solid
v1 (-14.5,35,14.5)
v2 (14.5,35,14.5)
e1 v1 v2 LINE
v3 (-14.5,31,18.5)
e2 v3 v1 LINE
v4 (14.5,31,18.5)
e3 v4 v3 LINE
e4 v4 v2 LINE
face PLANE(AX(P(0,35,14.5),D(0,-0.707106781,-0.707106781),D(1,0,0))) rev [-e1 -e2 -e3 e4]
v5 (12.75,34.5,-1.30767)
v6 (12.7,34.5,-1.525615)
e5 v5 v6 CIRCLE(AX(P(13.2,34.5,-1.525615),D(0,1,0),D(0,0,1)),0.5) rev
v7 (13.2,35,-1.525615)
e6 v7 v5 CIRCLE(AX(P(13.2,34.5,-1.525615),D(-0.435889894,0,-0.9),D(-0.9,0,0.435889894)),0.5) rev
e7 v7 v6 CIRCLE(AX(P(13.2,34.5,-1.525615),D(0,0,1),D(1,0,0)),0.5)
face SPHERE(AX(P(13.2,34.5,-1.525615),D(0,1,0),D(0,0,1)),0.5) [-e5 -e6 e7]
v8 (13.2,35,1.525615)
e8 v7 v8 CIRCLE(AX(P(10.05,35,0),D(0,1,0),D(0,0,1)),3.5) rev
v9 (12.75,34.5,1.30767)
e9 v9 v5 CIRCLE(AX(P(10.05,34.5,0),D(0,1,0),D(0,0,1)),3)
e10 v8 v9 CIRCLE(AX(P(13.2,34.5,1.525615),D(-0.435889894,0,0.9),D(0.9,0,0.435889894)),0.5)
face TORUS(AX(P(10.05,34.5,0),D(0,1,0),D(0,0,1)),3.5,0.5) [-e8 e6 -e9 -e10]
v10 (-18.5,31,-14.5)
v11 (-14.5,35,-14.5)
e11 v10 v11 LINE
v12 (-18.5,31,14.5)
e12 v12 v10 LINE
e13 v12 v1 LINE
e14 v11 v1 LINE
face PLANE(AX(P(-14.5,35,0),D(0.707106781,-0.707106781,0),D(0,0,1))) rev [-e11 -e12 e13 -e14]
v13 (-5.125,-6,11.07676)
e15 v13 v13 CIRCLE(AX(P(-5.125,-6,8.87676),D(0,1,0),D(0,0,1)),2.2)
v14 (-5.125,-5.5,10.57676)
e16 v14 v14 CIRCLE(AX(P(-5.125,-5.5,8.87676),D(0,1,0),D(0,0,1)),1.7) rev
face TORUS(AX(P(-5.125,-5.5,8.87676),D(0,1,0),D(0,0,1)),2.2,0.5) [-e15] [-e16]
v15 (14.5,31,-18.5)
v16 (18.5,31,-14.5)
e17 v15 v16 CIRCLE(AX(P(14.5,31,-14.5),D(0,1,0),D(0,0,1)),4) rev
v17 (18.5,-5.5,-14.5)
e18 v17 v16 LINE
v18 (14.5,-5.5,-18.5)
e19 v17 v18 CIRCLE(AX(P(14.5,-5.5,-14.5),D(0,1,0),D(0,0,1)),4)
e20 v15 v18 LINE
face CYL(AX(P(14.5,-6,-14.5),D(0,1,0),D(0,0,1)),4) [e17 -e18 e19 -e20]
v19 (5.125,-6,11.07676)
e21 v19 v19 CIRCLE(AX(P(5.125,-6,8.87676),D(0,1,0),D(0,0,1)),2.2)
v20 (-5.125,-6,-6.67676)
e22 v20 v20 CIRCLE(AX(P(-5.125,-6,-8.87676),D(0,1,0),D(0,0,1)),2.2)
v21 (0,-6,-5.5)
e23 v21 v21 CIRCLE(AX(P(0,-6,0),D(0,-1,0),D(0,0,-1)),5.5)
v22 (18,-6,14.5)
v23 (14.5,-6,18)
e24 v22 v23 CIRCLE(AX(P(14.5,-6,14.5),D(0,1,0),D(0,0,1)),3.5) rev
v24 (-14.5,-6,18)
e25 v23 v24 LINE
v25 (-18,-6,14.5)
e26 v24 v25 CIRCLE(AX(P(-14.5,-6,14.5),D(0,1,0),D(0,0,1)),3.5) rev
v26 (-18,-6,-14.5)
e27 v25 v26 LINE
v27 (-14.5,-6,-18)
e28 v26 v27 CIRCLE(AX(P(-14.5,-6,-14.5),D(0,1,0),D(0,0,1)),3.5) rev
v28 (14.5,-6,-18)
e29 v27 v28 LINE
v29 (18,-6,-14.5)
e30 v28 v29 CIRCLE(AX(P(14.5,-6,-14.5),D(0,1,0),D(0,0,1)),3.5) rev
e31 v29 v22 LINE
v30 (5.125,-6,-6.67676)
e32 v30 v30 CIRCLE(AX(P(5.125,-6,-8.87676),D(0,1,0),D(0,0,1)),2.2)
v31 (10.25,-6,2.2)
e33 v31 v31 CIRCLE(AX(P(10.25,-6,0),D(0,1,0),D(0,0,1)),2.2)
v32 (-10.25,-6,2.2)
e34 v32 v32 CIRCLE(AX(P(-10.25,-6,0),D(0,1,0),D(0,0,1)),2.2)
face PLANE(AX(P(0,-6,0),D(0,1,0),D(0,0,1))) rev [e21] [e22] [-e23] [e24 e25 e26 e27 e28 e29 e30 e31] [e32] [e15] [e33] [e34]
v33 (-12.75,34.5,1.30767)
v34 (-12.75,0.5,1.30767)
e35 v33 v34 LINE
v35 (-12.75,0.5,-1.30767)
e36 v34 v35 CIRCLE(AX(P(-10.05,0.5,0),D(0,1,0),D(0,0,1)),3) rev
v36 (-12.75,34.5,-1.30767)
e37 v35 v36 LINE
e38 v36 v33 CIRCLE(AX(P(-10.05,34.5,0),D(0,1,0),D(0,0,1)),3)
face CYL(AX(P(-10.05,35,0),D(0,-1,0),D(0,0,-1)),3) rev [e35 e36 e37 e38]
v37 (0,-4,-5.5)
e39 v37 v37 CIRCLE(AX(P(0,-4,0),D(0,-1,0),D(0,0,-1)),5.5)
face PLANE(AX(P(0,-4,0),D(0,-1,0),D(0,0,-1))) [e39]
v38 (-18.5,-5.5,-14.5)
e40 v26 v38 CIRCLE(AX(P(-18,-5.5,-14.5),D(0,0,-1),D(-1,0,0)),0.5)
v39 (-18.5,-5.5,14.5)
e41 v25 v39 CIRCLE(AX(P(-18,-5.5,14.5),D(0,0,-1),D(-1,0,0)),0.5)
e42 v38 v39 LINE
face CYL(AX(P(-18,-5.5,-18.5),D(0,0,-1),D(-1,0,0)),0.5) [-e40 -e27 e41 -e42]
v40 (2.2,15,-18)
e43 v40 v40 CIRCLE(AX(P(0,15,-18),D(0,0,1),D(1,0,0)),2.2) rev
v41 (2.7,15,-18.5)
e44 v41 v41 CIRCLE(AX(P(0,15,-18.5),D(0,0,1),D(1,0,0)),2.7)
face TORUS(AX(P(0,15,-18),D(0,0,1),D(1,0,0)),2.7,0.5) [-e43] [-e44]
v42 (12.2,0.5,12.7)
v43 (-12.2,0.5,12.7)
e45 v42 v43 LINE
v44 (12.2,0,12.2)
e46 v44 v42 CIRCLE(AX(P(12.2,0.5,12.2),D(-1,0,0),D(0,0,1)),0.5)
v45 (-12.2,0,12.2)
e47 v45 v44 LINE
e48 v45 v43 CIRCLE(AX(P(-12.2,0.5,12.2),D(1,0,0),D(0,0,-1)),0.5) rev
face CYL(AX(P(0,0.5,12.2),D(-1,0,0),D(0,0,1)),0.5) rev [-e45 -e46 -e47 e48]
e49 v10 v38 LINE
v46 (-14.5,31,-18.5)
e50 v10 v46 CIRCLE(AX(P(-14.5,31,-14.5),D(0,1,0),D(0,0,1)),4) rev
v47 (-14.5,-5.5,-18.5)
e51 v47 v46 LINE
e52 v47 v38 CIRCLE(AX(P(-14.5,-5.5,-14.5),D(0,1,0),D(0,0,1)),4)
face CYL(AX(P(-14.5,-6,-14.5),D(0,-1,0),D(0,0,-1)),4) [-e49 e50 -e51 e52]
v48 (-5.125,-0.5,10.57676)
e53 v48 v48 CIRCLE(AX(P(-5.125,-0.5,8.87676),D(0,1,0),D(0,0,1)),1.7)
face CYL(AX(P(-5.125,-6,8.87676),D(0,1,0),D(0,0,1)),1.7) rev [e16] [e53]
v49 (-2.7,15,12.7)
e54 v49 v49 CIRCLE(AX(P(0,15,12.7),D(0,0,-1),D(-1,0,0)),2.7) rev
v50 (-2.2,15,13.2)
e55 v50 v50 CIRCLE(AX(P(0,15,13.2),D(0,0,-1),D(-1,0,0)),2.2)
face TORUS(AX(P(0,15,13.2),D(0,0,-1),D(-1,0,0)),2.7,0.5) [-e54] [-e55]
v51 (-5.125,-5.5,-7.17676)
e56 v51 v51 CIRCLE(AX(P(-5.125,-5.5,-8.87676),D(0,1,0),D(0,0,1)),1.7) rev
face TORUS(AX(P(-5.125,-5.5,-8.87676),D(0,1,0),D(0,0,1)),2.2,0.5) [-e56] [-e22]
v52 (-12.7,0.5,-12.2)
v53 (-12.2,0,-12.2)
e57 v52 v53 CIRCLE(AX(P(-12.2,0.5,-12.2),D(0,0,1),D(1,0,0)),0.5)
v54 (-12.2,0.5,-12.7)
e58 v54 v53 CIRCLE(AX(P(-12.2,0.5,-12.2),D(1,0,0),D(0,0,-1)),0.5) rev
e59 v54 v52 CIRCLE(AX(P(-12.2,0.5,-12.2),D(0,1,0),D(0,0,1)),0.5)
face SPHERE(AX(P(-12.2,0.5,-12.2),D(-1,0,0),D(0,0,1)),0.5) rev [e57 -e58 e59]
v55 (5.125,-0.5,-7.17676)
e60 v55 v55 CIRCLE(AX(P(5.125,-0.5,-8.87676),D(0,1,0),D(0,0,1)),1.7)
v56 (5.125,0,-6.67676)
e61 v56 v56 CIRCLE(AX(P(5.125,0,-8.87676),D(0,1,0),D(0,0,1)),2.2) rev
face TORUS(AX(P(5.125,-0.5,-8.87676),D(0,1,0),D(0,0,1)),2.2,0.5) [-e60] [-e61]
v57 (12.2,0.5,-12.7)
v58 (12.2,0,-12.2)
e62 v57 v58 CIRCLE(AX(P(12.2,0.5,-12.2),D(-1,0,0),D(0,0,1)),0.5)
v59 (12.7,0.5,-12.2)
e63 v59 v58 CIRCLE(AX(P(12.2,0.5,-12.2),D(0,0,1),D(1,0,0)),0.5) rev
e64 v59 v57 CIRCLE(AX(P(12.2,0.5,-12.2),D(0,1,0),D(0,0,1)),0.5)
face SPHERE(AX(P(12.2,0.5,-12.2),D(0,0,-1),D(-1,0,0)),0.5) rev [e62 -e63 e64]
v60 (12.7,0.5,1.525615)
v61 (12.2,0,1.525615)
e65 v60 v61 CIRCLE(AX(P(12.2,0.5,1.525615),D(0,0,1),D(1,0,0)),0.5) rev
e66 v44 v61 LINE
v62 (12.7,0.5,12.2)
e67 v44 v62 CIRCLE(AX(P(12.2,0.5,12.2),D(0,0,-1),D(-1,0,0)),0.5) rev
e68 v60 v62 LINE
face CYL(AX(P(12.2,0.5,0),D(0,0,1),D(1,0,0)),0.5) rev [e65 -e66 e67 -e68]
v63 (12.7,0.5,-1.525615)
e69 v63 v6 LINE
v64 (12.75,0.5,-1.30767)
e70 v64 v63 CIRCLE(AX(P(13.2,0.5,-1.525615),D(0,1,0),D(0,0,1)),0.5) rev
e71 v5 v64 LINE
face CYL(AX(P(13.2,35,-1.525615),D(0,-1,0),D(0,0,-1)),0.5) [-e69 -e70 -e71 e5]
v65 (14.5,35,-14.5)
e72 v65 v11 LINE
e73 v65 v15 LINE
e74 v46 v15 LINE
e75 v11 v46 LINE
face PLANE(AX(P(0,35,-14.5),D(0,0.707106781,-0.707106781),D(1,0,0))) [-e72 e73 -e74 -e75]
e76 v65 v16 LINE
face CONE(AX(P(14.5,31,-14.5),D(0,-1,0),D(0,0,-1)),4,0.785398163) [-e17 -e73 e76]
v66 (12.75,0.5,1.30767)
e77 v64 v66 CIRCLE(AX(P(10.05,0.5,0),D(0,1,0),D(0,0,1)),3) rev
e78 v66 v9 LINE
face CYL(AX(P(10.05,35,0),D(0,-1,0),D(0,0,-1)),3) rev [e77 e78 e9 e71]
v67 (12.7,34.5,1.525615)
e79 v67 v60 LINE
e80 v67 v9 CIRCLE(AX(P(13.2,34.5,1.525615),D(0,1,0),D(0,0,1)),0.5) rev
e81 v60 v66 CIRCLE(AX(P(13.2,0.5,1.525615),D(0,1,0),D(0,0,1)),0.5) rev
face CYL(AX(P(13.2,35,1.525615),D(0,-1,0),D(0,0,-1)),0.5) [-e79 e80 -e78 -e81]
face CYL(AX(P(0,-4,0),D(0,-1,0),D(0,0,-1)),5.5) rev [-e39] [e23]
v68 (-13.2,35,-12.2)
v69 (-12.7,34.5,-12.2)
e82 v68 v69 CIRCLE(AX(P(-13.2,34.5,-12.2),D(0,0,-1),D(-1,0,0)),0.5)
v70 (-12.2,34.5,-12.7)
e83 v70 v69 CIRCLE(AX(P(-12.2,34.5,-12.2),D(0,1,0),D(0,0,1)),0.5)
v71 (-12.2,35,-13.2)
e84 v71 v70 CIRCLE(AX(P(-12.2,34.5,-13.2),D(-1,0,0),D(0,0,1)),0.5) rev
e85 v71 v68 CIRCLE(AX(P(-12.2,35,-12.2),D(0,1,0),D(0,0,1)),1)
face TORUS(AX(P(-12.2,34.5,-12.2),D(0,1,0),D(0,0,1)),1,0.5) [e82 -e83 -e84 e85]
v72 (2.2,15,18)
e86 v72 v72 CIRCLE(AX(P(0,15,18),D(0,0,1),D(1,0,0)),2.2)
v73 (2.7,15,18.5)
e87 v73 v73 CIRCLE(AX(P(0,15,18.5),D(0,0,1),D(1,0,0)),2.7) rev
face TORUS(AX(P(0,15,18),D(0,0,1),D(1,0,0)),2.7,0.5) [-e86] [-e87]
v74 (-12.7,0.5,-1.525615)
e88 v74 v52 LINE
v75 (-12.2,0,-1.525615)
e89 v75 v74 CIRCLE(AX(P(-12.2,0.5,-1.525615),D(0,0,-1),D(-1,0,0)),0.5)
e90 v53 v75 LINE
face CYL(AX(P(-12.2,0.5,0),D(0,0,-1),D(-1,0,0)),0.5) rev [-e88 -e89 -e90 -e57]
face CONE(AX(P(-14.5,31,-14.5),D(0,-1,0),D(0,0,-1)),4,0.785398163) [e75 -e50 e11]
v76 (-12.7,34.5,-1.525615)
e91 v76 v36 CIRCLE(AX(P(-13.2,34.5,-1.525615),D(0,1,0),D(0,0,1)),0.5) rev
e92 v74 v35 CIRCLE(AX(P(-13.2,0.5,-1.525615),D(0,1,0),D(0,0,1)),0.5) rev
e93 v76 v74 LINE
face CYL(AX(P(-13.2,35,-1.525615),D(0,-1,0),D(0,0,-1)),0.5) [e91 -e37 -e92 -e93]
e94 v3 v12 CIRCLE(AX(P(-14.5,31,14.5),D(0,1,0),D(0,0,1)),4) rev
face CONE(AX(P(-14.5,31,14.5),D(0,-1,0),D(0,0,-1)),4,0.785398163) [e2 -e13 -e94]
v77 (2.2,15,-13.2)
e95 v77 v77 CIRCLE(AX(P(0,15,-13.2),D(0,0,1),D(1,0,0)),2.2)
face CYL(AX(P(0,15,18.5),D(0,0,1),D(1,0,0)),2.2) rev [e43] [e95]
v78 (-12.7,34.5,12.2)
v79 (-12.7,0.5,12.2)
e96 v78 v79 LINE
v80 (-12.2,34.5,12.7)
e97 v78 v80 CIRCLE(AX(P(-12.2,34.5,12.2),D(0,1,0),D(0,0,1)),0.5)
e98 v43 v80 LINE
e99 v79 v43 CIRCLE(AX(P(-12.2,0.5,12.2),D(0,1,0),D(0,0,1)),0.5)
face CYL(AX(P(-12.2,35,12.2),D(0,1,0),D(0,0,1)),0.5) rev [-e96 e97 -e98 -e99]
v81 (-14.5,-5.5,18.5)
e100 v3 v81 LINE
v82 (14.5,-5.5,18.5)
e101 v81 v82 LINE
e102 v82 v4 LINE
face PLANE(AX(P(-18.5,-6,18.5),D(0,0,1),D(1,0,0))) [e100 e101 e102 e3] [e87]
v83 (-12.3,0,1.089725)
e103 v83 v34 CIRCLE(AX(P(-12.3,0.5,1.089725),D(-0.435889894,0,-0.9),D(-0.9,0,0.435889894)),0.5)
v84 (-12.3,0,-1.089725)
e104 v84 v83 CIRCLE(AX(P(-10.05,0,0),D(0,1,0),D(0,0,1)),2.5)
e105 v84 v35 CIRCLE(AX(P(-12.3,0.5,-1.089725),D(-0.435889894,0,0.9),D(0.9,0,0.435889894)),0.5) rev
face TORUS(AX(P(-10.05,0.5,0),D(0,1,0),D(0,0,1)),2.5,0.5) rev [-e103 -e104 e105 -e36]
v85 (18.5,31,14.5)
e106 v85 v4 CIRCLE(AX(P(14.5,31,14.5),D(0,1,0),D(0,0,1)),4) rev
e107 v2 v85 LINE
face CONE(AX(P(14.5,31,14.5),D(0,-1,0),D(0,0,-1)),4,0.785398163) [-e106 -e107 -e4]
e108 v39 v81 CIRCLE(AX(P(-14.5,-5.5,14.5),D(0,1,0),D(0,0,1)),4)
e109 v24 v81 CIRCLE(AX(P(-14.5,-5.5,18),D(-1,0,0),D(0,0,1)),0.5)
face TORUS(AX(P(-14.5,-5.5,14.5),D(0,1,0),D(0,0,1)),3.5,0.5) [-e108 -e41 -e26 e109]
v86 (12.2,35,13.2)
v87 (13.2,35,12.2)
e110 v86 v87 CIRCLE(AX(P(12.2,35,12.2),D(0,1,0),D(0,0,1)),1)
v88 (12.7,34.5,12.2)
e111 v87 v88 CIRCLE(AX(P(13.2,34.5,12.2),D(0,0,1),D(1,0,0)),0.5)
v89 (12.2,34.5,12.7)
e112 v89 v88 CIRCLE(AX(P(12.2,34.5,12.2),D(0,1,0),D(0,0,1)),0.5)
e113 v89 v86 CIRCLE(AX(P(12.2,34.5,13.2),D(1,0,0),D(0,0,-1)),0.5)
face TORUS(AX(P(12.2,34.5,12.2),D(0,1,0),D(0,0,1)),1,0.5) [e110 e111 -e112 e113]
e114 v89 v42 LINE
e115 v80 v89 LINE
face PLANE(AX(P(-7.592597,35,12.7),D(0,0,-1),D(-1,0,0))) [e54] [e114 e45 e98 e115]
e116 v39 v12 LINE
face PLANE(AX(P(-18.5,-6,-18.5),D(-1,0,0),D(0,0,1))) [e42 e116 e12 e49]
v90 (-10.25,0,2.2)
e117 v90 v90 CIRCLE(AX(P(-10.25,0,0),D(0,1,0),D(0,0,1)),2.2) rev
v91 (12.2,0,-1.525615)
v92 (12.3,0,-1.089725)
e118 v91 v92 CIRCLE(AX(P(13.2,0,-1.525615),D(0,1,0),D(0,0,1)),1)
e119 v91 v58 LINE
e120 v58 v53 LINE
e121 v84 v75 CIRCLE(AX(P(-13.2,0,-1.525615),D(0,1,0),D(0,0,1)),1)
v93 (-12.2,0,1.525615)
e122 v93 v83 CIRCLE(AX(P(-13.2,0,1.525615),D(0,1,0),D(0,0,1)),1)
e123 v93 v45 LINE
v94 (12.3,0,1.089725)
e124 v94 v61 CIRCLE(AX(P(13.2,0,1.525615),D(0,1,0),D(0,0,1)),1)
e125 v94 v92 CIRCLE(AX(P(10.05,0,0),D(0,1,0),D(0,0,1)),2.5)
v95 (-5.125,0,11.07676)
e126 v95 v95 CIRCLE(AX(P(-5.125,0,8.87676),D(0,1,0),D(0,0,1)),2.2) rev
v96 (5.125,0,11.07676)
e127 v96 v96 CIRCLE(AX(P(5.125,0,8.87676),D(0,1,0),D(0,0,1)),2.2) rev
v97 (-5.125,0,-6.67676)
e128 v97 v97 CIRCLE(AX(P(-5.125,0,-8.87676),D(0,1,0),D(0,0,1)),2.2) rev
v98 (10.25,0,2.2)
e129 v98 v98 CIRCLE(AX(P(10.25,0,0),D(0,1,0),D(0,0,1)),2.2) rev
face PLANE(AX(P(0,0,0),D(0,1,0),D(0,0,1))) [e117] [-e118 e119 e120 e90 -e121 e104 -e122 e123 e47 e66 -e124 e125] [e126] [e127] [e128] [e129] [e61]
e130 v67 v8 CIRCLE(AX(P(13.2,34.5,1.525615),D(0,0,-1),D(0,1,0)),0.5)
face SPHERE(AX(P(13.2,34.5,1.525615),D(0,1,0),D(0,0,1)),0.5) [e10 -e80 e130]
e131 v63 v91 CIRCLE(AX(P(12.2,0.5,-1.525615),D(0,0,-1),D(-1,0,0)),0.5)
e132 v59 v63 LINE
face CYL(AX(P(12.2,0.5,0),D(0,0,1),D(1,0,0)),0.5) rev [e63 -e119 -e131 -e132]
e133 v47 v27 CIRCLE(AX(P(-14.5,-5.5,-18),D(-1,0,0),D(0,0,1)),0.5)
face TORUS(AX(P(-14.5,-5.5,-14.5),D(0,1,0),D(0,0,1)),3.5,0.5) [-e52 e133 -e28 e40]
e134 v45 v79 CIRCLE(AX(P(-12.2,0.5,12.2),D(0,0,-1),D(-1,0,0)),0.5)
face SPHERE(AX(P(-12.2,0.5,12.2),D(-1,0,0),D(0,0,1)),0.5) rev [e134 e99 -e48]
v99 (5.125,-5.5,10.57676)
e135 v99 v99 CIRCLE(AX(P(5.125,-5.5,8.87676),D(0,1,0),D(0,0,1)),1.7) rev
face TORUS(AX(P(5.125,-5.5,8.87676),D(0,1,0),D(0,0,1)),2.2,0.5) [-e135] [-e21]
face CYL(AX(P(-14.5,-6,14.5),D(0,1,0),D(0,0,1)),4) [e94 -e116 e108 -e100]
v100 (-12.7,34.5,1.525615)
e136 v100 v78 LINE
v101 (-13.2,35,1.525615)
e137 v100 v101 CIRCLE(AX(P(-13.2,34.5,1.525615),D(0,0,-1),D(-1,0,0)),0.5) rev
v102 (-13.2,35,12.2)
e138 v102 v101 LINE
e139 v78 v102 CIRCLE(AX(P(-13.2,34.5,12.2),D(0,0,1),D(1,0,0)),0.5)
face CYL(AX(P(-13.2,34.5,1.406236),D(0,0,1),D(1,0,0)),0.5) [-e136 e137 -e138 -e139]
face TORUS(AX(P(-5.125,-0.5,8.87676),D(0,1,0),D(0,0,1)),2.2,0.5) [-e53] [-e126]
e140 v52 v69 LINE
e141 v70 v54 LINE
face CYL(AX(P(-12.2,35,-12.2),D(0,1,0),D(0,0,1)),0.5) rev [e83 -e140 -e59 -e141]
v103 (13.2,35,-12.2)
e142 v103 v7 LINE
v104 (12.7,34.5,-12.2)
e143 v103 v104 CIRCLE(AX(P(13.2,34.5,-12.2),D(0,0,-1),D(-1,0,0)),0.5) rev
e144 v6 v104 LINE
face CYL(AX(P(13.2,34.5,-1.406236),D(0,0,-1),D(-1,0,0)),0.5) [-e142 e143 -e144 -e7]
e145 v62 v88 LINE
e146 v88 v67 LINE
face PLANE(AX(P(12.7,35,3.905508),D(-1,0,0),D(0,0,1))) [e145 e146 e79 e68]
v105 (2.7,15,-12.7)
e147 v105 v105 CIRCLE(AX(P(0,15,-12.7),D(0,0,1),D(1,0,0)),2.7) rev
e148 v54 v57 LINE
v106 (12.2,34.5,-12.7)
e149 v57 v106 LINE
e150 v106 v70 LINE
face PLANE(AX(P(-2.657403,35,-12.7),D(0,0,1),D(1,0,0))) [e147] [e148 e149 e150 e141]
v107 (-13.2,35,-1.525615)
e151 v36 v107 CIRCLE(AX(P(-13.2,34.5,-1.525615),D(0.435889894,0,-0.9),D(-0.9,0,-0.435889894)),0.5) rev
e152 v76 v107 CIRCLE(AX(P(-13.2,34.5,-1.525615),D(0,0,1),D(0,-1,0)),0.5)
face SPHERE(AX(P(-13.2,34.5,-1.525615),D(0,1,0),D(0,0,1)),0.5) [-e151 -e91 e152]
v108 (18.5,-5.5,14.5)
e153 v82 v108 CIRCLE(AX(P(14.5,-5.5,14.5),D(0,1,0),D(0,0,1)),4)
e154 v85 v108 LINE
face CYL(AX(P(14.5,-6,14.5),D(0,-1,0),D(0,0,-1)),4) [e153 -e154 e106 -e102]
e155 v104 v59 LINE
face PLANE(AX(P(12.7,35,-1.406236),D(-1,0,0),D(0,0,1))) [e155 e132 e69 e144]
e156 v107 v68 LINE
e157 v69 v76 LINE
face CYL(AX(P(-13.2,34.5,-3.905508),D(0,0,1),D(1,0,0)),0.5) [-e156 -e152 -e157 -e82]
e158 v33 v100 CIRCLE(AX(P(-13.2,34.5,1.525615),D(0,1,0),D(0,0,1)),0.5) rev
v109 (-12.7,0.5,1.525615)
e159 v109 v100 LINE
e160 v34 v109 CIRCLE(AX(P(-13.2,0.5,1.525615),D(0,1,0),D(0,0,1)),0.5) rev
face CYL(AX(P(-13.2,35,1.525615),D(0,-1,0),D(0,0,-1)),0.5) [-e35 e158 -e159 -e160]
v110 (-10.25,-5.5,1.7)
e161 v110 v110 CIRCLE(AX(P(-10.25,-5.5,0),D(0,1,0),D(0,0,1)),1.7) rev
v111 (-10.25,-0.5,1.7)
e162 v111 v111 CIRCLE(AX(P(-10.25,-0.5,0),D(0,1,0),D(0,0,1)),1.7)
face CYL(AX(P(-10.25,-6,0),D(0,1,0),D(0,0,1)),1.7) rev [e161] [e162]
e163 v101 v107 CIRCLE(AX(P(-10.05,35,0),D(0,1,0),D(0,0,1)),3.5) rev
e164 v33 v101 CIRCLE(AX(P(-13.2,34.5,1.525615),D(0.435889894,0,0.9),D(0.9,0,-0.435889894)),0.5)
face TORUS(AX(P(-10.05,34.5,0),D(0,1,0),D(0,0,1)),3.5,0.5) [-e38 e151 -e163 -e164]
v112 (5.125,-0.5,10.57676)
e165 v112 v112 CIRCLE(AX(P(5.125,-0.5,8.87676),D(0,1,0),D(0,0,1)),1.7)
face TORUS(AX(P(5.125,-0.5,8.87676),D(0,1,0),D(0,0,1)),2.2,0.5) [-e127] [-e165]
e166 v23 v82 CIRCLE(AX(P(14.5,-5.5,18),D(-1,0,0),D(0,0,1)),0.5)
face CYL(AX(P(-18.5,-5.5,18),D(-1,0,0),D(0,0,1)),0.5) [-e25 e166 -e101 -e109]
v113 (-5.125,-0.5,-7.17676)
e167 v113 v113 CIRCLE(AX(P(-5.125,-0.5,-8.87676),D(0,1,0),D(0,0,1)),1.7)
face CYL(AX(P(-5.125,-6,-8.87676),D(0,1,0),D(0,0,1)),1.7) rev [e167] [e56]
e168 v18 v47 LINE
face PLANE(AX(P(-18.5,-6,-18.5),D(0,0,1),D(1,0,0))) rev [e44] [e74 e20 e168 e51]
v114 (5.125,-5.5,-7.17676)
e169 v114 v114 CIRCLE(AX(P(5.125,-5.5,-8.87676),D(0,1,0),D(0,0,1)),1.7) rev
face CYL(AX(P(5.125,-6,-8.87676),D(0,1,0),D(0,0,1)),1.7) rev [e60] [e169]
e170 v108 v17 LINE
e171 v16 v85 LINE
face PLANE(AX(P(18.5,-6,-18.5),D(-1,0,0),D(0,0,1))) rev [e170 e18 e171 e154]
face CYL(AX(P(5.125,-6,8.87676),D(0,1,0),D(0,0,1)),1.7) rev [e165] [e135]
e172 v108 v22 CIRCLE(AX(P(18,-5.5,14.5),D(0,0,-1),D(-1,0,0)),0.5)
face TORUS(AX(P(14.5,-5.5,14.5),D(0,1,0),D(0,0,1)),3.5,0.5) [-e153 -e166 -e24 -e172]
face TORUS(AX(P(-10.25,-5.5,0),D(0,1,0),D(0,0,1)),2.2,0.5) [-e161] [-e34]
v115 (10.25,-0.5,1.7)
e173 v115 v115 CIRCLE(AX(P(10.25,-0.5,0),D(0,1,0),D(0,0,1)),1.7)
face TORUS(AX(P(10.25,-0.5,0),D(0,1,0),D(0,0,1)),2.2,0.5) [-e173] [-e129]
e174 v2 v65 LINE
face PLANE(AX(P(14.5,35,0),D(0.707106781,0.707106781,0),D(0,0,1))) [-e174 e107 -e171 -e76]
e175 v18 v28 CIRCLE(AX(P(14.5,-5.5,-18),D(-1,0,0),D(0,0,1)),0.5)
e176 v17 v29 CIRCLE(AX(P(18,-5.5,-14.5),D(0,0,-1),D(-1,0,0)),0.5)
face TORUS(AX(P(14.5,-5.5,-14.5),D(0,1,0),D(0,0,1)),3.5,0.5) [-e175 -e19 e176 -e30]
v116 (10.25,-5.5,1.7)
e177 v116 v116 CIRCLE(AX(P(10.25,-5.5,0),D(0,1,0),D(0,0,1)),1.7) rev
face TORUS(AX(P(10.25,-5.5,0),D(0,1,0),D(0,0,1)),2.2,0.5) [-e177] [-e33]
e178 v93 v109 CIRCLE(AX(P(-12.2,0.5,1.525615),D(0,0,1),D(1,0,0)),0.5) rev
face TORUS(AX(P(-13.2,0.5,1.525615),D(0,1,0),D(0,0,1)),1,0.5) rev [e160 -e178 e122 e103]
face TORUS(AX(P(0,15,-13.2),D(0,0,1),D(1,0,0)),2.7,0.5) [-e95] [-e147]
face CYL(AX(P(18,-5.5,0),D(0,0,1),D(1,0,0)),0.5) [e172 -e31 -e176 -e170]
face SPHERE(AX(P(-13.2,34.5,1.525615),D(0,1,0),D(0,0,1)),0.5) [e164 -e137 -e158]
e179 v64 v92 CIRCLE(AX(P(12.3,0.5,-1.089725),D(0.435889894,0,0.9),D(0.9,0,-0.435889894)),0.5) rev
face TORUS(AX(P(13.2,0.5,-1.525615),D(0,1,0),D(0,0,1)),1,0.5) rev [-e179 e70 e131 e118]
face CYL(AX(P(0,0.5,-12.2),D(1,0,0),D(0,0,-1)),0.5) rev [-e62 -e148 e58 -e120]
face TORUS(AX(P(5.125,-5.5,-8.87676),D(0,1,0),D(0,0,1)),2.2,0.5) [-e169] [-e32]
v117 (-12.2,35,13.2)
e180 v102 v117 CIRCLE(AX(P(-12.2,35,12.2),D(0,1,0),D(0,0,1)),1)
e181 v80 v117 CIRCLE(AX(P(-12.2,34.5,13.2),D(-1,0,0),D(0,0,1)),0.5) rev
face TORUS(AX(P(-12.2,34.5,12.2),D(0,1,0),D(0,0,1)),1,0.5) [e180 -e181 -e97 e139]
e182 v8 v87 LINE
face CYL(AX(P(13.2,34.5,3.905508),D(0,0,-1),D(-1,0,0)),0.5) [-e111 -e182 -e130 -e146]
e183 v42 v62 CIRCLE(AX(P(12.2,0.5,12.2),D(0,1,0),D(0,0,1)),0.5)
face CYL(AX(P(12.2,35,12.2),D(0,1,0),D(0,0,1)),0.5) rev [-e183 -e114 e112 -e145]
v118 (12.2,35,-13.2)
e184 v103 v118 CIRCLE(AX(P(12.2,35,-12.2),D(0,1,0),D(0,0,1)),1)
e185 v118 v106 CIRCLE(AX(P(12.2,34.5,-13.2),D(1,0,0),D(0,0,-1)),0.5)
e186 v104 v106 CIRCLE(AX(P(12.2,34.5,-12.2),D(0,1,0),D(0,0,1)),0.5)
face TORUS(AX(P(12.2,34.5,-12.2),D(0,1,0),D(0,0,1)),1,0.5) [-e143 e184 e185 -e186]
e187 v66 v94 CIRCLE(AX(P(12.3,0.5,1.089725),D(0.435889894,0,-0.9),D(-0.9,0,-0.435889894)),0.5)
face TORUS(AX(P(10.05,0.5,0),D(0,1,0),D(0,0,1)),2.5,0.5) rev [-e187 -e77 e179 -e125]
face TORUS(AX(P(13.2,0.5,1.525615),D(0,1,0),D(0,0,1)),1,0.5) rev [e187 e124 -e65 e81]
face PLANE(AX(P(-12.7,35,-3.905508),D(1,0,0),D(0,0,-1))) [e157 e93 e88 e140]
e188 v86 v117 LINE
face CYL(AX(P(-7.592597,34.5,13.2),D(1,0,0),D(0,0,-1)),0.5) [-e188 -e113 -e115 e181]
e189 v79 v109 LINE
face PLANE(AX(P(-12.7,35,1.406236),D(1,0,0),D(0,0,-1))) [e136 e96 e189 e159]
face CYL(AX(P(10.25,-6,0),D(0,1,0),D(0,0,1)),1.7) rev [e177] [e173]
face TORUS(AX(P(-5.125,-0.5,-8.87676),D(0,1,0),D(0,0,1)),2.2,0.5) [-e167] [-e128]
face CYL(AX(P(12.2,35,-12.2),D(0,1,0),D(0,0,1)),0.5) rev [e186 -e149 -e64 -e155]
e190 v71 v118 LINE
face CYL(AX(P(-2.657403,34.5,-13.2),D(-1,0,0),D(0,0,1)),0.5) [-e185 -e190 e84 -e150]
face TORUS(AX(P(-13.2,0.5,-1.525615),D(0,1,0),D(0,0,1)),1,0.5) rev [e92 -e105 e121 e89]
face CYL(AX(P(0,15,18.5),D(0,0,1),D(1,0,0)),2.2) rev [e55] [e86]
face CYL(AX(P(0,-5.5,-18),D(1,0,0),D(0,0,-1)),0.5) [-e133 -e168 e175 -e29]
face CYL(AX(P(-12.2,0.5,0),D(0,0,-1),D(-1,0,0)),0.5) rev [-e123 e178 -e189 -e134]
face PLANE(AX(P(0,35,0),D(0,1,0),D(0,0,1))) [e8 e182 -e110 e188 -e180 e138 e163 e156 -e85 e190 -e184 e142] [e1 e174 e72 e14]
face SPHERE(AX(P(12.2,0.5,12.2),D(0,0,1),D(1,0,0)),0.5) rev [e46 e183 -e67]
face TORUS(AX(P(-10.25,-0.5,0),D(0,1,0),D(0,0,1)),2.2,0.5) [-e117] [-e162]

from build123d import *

# Parameters (mm, degrees)
SKIZZE1_W                        = 37
SKIZZE1_H                        = 37
SKIZZE1_R                        = 1.7
AUFSATZ_LINEAR_AUSTRAGEN1_DEPTH  = 6
SKIZZE2_W                        = 37
SKIZZE2_H                        = 37
AUFSATZ_LINEAR_AUSTRAGEN2_DEPTH  = 35
VERRUNDUNG1_R                    = 4
VERRUNDUNG4_R                    = 0.5
VERRUNDUNG5_R                    = 0.5
FASE1_SIZE                       = 4
F_4_4_4_4_DURCHMESSER_BOHRUNG1_D = 4.4
VERRUNDUNG6_R                    = 0.5
SKIZZE5_R                        = 5.5
SCHNITT_LINEAR_AUSTRAGEN1_DEPTH  = 2


with BuildPart() as part:
    # Skizze1 → Aufsatz-Linear austragen1 (new body)
    with BuildSketch(Plane(origin=(0, 0, 0), x_dir=(1, 0, 0), z_dir=(0, 1, 0))):
        Rectangle(SKIZZE1_W, SKIZZE1_H)
        with Locations(Location((10.25, 0, 0), (0, 0, 270))):
            Circle(SKIZZE1_R, mode=Mode.SUBTRACT)
        with Locations(Location((5.125, -8.876760389, 0), (0, 0, 270))):
            Circle(SKIZZE1_R, mode=Mode.SUBTRACT)
        with Locations(Location((-5.125, -8.876760389, 0), (0, 0, 270))):
            Circle(SKIZZE1_R, mode=Mode.SUBTRACT)
        with Locations(Location((-10.25, 0, 0), (0, 0, 270))):
            Circle(SKIZZE1_R, mode=Mode.SUBTRACT)
        with Locations(Location((-5.125, 8.876760389, 0), (0, 0, 270))):
            Circle(SKIZZE1_R, mode=Mode.SUBTRACT)
        with Locations(Location((5.125, 8.876760389, 0), (0, 0, 270))):
            Circle(SKIZZE1_R, mode=Mode.SUBTRACT)
    extrude(amount=-AUFSATZ_LINEAR_AUSTRAGEN1_DEPTH)

    # Skizze2 → Aufsatz-Linear austragen2 (add)
    with BuildSketch(Plane(origin=(0, 0, 0), x_dir=(1, 0, 0), z_dir=(0, 1, 0))):
        Rectangle(SKIZZE2_W, SKIZZE2_H)
        with BuildLine():
            Line((12.7, 12.7), (7.592597401, 12.7))
            Line((7.592597401, 12.7), (-2.657402599, 12.7))
            Line((-2.657402599, 12.7), (-12.7, 12.7))
            Line((-12.7, 12.7), (-12.7, 3.905508149))
            Line((-12.7, 3.905508149), (-12.7, 1.406236111))
            ThreePointArc((-12.7, 1.406236111), (-13.05, 0), (-12.7, -1.406236111))
            Line((-12.7, -1.406236111), (-12.7, -12.7))
            Line((-12.7, -12.7), (-7.592597401, -12.7))
            Line((-7.592597401, -12.7), (12.7, -12.7))
            Line((12.7, -12.7), (12.7, -3.905508149))
            Line((12.7, -3.905508149), (12.7, -1.406236111))
            ThreePointArc((12.7, -1.406236111), (13.05, 0), (12.7, 1.406236111))
            Line((12.7, 1.406236111), (12.7, 12.7))
        make_face(mode=Mode.SUBTRACT)
    extrude(amount=AUFSATZ_LINEAR_AUSTRAGEN2_DEPTH)

    # Verrundung1
    verrundung1_edges = [part.edges().sort_by_distance(p)[0] for p in [
        (-18.5, 14.5, -18.5),
        (18.5, 14.5, -18.5),
        (18.5, 14.5, 18.5),
        (-18.5, 14.5, 18.5),
    ]]
    fillet(verrundung1_edges, radius=VERRUNDUNG1_R)

    # Verrundung4
    verrundung4_edges = [part.edges().sort_by_distance(p)[0] for p in [
        (-10.25, -6, -1.7),
        (-10.25, 0, -1.7),
        (-5.125, -6, -10.576760389),
        (-5.125, 0, -10.576760389),
        (5.125, -6, -10.576760389),
        (5.125, 0, -10.576760389),
        (10.25, -6, -1.7),
        (10.25, 0, -1.7),
        (-5.125, -6, 7.176760389),
        (-5.125, 0, 7.176760389),
        (5.125, -6, 7.176760389),
        (5.125, 0, 7.176760389),
        (-18.5, -6, 0),
        (0, -6, 18.5),
        (0, -6, -18.5),
        (18.5, -6, 0),
        (17.328427125, -6, -17.328427125),
        (-17.328427125, -6, -17.328427125),
        (17.328427125, -6, 17.328427125),
        (-17.328427125, -6, 17.328427125),
    ]]
    fillet(verrundung4_edges, radius=VERRUNDUNG4_R)

    # Verrundung5
    verrundung5_edges = [part.edges().sort_by_distance(p)[0] for p in [
        (12.7, 0, -7.053118056),
        (0, 0, -12.7),
        (-12.7, 0, -7.053118056),
        (-13.05, 0, 0),
        (-12.7, 0, 7.053118056),
        (0, 0, 12.7),
        (12.7, 0, 7.053118056),
        (13.05, 0, 0),
        (12.7, 35, -7.053118056),
        (12.7, 17.5, -12.7),
        (0, 35, -12.7),
        (-12.7, 17.5, -12.7),
        (-12.7, 35, -7.053118056),
        (-12.7, 17.5, -1.406236111),
        (-13.05, 35, 0),
        (-12.7, 17.5, 1.406236111),
        (-12.7, 35, 7.053118056),
        (-12.7, 17.5, 12.7),
        (0, 35, 12.7),
        (12.7, 17.5, 12.7),
        (12.7, 35, 7.053118056),
        (12.7, 17.5, 1.406236111),
        (13.05, 35, 0),
        (12.7, 17.5, -1.406236111),
    ]]
    fillet(verrundung5_edges, radius=VERRUNDUNG5_R)

    # Fase1
    fase1_edges = [part.edges().sort_by_distance(p)[0] for p in [
        (-18.5, 35, 0),
        (0, 35, -18.5),
        (0, 35, 18.5),
        (18.5, 35, 0),
        (17.328427125, 35, -17.328427125),
        (-17.328427125, 35, -17.328427125),
        (17.328427125, 35, 17.328427125),
        (-17.328427125, 35, 17.328427125),
    ]]
    chamfer(fase1_edges, length=FASE1_SIZE - 0.0001)  # a hair under: the kernel refuses the full size

    # Ø4.4 (4.4) Durchmesser Bohrung1 (through all)
    with Locations(Plane.XY.offset(18.5)):
        with Locations((0, 15)):
            Hole(F_4_4_4_4_DURCHMESSER_BOHRUNG1_D / 2)

    # Verrundung6
    verrundung6_edges = [part.edges().sort_by_distance(p)[0] for p in [
        (2.2, 15, -12.7),
        (2.2, 15, 12.7),
        (2.2, 15, 18.5),
        (2.2, 15, -18.5),
    ]]
    fillet(verrundung6_edges, radius=VERRUNDUNG6_R)

    # Skizze5 → Schnitt-Linear austragen1 (cut)
    with BuildSketch(Plane.XZ.offset(6)):
        with Locations(Location((0, 0, 0), (0, 0, 270))):
            Circle(SKIZZE5_R)
    extrude(amount=-SCHNITT_LINEAR_AUSTRAGEN1_DEPTH, mode=Mode.SUBTRACT)


solid = part.part
